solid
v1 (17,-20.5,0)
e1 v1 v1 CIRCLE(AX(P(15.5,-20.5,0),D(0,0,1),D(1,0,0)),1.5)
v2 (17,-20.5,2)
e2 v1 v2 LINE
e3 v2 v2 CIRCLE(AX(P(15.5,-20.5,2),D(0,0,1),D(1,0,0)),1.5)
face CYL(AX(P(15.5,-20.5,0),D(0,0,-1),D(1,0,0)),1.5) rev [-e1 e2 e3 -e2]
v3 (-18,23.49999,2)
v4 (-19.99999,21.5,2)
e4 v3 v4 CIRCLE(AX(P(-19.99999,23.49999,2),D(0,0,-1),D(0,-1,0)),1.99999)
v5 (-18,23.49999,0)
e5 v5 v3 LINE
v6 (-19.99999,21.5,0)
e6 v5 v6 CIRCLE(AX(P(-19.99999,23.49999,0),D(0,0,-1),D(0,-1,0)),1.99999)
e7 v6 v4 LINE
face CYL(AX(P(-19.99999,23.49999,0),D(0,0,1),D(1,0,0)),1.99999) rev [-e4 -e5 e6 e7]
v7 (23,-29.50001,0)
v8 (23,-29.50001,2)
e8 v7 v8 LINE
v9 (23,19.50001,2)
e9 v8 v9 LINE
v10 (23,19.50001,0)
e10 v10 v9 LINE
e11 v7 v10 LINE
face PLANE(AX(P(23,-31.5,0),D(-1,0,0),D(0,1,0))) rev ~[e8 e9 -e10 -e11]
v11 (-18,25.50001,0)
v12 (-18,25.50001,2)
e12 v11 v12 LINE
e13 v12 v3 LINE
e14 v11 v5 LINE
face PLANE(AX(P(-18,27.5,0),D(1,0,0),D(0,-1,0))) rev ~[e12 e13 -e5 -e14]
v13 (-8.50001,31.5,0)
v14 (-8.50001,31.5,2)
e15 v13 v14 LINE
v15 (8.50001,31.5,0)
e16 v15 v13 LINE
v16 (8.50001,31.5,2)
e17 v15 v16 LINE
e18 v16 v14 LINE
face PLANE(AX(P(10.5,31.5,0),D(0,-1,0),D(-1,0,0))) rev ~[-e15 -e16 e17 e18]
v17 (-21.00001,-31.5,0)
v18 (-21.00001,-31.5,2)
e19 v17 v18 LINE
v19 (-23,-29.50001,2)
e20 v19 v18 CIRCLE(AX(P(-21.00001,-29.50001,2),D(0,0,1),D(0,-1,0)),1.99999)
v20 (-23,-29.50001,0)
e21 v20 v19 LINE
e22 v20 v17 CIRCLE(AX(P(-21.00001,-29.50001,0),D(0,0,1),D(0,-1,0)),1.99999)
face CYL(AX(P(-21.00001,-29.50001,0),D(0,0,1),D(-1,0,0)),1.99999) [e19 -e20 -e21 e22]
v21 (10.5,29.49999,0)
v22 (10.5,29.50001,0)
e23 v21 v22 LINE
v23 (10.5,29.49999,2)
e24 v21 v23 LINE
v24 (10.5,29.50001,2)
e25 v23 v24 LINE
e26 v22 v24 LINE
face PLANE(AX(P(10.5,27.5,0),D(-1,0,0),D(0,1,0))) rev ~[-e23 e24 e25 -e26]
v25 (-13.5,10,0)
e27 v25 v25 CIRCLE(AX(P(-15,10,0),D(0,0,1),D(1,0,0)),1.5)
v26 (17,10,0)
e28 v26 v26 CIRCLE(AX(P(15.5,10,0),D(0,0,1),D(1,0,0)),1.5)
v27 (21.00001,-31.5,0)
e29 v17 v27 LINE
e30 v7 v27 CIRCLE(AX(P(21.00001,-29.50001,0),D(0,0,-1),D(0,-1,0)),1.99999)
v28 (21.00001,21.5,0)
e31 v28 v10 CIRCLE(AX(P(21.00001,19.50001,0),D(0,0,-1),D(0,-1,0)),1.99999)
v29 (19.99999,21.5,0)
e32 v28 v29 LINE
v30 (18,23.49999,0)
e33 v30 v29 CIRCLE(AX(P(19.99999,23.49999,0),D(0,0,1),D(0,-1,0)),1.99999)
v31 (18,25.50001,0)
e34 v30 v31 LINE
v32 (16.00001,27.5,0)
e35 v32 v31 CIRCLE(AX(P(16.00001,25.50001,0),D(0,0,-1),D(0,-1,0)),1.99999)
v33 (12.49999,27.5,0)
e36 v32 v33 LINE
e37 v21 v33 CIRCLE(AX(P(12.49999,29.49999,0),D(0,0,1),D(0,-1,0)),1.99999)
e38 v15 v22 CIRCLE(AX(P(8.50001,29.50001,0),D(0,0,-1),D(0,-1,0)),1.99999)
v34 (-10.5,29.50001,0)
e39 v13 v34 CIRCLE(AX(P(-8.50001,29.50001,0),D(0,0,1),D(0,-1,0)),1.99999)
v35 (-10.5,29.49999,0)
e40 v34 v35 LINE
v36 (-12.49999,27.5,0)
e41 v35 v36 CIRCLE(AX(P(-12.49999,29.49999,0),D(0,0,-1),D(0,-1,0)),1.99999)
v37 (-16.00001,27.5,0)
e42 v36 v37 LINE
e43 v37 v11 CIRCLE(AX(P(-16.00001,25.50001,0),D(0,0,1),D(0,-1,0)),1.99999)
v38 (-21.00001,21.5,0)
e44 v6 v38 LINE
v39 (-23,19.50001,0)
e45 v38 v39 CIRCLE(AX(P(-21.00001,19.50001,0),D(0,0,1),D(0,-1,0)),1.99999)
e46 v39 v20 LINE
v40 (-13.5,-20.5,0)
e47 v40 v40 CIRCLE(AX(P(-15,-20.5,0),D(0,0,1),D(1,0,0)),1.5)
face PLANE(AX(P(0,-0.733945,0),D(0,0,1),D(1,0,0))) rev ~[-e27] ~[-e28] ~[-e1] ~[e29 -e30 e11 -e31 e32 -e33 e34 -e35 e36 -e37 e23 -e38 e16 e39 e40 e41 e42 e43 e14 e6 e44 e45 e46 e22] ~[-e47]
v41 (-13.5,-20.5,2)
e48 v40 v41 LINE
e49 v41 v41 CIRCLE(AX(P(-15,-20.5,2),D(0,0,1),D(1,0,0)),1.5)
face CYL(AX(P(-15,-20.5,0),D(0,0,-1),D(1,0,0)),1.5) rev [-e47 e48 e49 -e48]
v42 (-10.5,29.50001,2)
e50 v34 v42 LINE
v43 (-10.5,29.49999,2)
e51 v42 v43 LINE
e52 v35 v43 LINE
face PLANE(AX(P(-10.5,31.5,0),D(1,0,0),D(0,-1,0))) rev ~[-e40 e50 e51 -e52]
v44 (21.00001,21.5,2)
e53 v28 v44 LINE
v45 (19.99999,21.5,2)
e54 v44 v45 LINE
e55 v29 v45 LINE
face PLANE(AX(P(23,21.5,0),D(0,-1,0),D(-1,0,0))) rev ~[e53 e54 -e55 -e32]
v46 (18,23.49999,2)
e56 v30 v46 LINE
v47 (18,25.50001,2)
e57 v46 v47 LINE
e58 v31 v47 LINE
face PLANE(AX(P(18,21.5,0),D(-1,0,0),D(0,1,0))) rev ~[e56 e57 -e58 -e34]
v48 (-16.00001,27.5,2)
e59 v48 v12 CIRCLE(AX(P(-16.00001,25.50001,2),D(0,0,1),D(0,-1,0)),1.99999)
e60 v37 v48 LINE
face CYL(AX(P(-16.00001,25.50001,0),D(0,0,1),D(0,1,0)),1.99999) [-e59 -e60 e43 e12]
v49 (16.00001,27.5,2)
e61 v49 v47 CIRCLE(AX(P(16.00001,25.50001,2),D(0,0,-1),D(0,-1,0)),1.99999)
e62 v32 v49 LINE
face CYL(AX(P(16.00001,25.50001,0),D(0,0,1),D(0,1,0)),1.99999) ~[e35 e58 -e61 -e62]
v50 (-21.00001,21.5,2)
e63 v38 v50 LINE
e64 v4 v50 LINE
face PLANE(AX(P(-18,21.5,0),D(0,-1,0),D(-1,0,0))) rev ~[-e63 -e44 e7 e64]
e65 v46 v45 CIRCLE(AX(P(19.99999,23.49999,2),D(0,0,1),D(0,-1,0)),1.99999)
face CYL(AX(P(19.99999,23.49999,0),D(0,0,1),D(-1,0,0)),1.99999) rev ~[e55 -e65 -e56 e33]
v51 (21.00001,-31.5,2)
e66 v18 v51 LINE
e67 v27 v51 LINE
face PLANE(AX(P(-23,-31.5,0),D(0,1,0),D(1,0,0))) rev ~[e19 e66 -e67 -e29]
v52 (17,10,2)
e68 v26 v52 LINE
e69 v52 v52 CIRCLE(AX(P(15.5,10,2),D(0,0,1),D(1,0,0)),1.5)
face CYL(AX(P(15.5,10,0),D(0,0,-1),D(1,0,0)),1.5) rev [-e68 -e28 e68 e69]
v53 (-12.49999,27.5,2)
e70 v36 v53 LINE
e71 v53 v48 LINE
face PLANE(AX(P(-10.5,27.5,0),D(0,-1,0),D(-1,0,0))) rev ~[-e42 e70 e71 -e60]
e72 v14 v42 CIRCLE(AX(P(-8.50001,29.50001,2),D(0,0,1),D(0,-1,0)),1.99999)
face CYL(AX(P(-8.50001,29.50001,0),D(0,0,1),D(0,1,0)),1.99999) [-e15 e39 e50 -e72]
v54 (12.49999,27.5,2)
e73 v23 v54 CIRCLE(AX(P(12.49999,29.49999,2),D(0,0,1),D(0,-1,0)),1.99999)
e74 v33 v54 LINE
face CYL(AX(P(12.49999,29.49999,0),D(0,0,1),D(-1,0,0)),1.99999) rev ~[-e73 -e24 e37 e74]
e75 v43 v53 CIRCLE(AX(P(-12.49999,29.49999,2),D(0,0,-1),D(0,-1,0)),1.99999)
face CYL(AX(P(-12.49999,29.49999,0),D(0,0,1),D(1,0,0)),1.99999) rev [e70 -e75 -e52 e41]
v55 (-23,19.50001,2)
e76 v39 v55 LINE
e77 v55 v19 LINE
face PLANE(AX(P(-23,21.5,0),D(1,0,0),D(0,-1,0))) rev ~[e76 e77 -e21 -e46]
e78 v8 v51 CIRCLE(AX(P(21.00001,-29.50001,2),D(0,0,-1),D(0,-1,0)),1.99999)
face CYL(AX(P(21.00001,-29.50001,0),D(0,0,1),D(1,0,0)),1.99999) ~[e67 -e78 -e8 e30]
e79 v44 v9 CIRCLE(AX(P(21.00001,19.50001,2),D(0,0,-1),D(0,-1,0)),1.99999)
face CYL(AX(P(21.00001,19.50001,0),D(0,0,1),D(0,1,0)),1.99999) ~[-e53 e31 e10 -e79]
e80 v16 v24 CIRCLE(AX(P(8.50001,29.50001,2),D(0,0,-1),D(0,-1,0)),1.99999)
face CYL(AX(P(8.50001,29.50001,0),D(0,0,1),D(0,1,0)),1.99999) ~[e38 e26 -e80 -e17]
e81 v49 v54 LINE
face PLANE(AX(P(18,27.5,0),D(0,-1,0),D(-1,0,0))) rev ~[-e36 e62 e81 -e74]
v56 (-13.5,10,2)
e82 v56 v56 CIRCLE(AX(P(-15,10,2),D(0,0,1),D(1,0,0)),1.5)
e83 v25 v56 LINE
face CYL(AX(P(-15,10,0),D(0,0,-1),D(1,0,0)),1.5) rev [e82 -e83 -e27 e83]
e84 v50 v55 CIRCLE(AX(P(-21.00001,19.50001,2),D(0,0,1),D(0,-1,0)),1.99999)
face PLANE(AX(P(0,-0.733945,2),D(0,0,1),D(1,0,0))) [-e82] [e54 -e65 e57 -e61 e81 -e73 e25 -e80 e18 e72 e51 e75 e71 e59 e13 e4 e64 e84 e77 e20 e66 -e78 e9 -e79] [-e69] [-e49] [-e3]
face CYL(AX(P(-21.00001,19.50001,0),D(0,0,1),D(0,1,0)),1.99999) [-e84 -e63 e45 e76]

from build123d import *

# Parameters (mm, degrees)
F0_R     = 1.5
F1_DEPTH = 2
F2_R     = 1.99999


# Not quite as in the source:
# - a fillet or chamfer is up to 0.001 mm smaller than in the source, because OpenCascade refuses the exact size


with BuildPart() as f1:
    # F0 (on Top) → F1 (new body)
    with BuildSketch(Plane.XY):
        Polygon((10.5, 31.5), (-10.5, 31.5), (-10.5, 27.5), (-18, 27.5), (-18, 21.5), (-23, 21.5), (-23, -31.5), (23, -31.5), (23, 21.5), (18, 21.5), (18, 27.5), (10.5, 27.5), align=None)
        with Locations((-15, -20.5)):
            Circle(F0_R, mode=Mode.SUBTRACT)
        with Locations((15.5, -20.5)):
            Circle(F0_R, mode=Mode.SUBTRACT)
        with Locations((-15, 10)):
            Circle(F0_R, mode=Mode.SUBTRACT)
        with Locations((15.5, 10)):
            Circle(F0_R, mode=Mode.SUBTRACT)
    extrude(amount=F1_DEPTH)

    # F2 (radius 2 in the source; OpenCascade refuses exactly that, so slightly less here)
    f2_edges = [f1.edges().sort_by_distance(p)[0] for p in [
        (10.5, 31.5, 1),
        (23, 21.5, 1),
        (18, 27.5, 1),
        (18, 21.5, 1),
        (10.5, 27.5, 1),
        (-10.5, 31.5, 1),
        (-10.5, 27.5, 1),
        (-18, 27.5, 1),
        (-18, 21.5, 1),
        (-23, 21.5, 1),
        (-23, -31.5, 1),
        (23, -31.5, 1),
    ]]
    fillet(f2_edges, radius=F2_R)


solid = f1.part
